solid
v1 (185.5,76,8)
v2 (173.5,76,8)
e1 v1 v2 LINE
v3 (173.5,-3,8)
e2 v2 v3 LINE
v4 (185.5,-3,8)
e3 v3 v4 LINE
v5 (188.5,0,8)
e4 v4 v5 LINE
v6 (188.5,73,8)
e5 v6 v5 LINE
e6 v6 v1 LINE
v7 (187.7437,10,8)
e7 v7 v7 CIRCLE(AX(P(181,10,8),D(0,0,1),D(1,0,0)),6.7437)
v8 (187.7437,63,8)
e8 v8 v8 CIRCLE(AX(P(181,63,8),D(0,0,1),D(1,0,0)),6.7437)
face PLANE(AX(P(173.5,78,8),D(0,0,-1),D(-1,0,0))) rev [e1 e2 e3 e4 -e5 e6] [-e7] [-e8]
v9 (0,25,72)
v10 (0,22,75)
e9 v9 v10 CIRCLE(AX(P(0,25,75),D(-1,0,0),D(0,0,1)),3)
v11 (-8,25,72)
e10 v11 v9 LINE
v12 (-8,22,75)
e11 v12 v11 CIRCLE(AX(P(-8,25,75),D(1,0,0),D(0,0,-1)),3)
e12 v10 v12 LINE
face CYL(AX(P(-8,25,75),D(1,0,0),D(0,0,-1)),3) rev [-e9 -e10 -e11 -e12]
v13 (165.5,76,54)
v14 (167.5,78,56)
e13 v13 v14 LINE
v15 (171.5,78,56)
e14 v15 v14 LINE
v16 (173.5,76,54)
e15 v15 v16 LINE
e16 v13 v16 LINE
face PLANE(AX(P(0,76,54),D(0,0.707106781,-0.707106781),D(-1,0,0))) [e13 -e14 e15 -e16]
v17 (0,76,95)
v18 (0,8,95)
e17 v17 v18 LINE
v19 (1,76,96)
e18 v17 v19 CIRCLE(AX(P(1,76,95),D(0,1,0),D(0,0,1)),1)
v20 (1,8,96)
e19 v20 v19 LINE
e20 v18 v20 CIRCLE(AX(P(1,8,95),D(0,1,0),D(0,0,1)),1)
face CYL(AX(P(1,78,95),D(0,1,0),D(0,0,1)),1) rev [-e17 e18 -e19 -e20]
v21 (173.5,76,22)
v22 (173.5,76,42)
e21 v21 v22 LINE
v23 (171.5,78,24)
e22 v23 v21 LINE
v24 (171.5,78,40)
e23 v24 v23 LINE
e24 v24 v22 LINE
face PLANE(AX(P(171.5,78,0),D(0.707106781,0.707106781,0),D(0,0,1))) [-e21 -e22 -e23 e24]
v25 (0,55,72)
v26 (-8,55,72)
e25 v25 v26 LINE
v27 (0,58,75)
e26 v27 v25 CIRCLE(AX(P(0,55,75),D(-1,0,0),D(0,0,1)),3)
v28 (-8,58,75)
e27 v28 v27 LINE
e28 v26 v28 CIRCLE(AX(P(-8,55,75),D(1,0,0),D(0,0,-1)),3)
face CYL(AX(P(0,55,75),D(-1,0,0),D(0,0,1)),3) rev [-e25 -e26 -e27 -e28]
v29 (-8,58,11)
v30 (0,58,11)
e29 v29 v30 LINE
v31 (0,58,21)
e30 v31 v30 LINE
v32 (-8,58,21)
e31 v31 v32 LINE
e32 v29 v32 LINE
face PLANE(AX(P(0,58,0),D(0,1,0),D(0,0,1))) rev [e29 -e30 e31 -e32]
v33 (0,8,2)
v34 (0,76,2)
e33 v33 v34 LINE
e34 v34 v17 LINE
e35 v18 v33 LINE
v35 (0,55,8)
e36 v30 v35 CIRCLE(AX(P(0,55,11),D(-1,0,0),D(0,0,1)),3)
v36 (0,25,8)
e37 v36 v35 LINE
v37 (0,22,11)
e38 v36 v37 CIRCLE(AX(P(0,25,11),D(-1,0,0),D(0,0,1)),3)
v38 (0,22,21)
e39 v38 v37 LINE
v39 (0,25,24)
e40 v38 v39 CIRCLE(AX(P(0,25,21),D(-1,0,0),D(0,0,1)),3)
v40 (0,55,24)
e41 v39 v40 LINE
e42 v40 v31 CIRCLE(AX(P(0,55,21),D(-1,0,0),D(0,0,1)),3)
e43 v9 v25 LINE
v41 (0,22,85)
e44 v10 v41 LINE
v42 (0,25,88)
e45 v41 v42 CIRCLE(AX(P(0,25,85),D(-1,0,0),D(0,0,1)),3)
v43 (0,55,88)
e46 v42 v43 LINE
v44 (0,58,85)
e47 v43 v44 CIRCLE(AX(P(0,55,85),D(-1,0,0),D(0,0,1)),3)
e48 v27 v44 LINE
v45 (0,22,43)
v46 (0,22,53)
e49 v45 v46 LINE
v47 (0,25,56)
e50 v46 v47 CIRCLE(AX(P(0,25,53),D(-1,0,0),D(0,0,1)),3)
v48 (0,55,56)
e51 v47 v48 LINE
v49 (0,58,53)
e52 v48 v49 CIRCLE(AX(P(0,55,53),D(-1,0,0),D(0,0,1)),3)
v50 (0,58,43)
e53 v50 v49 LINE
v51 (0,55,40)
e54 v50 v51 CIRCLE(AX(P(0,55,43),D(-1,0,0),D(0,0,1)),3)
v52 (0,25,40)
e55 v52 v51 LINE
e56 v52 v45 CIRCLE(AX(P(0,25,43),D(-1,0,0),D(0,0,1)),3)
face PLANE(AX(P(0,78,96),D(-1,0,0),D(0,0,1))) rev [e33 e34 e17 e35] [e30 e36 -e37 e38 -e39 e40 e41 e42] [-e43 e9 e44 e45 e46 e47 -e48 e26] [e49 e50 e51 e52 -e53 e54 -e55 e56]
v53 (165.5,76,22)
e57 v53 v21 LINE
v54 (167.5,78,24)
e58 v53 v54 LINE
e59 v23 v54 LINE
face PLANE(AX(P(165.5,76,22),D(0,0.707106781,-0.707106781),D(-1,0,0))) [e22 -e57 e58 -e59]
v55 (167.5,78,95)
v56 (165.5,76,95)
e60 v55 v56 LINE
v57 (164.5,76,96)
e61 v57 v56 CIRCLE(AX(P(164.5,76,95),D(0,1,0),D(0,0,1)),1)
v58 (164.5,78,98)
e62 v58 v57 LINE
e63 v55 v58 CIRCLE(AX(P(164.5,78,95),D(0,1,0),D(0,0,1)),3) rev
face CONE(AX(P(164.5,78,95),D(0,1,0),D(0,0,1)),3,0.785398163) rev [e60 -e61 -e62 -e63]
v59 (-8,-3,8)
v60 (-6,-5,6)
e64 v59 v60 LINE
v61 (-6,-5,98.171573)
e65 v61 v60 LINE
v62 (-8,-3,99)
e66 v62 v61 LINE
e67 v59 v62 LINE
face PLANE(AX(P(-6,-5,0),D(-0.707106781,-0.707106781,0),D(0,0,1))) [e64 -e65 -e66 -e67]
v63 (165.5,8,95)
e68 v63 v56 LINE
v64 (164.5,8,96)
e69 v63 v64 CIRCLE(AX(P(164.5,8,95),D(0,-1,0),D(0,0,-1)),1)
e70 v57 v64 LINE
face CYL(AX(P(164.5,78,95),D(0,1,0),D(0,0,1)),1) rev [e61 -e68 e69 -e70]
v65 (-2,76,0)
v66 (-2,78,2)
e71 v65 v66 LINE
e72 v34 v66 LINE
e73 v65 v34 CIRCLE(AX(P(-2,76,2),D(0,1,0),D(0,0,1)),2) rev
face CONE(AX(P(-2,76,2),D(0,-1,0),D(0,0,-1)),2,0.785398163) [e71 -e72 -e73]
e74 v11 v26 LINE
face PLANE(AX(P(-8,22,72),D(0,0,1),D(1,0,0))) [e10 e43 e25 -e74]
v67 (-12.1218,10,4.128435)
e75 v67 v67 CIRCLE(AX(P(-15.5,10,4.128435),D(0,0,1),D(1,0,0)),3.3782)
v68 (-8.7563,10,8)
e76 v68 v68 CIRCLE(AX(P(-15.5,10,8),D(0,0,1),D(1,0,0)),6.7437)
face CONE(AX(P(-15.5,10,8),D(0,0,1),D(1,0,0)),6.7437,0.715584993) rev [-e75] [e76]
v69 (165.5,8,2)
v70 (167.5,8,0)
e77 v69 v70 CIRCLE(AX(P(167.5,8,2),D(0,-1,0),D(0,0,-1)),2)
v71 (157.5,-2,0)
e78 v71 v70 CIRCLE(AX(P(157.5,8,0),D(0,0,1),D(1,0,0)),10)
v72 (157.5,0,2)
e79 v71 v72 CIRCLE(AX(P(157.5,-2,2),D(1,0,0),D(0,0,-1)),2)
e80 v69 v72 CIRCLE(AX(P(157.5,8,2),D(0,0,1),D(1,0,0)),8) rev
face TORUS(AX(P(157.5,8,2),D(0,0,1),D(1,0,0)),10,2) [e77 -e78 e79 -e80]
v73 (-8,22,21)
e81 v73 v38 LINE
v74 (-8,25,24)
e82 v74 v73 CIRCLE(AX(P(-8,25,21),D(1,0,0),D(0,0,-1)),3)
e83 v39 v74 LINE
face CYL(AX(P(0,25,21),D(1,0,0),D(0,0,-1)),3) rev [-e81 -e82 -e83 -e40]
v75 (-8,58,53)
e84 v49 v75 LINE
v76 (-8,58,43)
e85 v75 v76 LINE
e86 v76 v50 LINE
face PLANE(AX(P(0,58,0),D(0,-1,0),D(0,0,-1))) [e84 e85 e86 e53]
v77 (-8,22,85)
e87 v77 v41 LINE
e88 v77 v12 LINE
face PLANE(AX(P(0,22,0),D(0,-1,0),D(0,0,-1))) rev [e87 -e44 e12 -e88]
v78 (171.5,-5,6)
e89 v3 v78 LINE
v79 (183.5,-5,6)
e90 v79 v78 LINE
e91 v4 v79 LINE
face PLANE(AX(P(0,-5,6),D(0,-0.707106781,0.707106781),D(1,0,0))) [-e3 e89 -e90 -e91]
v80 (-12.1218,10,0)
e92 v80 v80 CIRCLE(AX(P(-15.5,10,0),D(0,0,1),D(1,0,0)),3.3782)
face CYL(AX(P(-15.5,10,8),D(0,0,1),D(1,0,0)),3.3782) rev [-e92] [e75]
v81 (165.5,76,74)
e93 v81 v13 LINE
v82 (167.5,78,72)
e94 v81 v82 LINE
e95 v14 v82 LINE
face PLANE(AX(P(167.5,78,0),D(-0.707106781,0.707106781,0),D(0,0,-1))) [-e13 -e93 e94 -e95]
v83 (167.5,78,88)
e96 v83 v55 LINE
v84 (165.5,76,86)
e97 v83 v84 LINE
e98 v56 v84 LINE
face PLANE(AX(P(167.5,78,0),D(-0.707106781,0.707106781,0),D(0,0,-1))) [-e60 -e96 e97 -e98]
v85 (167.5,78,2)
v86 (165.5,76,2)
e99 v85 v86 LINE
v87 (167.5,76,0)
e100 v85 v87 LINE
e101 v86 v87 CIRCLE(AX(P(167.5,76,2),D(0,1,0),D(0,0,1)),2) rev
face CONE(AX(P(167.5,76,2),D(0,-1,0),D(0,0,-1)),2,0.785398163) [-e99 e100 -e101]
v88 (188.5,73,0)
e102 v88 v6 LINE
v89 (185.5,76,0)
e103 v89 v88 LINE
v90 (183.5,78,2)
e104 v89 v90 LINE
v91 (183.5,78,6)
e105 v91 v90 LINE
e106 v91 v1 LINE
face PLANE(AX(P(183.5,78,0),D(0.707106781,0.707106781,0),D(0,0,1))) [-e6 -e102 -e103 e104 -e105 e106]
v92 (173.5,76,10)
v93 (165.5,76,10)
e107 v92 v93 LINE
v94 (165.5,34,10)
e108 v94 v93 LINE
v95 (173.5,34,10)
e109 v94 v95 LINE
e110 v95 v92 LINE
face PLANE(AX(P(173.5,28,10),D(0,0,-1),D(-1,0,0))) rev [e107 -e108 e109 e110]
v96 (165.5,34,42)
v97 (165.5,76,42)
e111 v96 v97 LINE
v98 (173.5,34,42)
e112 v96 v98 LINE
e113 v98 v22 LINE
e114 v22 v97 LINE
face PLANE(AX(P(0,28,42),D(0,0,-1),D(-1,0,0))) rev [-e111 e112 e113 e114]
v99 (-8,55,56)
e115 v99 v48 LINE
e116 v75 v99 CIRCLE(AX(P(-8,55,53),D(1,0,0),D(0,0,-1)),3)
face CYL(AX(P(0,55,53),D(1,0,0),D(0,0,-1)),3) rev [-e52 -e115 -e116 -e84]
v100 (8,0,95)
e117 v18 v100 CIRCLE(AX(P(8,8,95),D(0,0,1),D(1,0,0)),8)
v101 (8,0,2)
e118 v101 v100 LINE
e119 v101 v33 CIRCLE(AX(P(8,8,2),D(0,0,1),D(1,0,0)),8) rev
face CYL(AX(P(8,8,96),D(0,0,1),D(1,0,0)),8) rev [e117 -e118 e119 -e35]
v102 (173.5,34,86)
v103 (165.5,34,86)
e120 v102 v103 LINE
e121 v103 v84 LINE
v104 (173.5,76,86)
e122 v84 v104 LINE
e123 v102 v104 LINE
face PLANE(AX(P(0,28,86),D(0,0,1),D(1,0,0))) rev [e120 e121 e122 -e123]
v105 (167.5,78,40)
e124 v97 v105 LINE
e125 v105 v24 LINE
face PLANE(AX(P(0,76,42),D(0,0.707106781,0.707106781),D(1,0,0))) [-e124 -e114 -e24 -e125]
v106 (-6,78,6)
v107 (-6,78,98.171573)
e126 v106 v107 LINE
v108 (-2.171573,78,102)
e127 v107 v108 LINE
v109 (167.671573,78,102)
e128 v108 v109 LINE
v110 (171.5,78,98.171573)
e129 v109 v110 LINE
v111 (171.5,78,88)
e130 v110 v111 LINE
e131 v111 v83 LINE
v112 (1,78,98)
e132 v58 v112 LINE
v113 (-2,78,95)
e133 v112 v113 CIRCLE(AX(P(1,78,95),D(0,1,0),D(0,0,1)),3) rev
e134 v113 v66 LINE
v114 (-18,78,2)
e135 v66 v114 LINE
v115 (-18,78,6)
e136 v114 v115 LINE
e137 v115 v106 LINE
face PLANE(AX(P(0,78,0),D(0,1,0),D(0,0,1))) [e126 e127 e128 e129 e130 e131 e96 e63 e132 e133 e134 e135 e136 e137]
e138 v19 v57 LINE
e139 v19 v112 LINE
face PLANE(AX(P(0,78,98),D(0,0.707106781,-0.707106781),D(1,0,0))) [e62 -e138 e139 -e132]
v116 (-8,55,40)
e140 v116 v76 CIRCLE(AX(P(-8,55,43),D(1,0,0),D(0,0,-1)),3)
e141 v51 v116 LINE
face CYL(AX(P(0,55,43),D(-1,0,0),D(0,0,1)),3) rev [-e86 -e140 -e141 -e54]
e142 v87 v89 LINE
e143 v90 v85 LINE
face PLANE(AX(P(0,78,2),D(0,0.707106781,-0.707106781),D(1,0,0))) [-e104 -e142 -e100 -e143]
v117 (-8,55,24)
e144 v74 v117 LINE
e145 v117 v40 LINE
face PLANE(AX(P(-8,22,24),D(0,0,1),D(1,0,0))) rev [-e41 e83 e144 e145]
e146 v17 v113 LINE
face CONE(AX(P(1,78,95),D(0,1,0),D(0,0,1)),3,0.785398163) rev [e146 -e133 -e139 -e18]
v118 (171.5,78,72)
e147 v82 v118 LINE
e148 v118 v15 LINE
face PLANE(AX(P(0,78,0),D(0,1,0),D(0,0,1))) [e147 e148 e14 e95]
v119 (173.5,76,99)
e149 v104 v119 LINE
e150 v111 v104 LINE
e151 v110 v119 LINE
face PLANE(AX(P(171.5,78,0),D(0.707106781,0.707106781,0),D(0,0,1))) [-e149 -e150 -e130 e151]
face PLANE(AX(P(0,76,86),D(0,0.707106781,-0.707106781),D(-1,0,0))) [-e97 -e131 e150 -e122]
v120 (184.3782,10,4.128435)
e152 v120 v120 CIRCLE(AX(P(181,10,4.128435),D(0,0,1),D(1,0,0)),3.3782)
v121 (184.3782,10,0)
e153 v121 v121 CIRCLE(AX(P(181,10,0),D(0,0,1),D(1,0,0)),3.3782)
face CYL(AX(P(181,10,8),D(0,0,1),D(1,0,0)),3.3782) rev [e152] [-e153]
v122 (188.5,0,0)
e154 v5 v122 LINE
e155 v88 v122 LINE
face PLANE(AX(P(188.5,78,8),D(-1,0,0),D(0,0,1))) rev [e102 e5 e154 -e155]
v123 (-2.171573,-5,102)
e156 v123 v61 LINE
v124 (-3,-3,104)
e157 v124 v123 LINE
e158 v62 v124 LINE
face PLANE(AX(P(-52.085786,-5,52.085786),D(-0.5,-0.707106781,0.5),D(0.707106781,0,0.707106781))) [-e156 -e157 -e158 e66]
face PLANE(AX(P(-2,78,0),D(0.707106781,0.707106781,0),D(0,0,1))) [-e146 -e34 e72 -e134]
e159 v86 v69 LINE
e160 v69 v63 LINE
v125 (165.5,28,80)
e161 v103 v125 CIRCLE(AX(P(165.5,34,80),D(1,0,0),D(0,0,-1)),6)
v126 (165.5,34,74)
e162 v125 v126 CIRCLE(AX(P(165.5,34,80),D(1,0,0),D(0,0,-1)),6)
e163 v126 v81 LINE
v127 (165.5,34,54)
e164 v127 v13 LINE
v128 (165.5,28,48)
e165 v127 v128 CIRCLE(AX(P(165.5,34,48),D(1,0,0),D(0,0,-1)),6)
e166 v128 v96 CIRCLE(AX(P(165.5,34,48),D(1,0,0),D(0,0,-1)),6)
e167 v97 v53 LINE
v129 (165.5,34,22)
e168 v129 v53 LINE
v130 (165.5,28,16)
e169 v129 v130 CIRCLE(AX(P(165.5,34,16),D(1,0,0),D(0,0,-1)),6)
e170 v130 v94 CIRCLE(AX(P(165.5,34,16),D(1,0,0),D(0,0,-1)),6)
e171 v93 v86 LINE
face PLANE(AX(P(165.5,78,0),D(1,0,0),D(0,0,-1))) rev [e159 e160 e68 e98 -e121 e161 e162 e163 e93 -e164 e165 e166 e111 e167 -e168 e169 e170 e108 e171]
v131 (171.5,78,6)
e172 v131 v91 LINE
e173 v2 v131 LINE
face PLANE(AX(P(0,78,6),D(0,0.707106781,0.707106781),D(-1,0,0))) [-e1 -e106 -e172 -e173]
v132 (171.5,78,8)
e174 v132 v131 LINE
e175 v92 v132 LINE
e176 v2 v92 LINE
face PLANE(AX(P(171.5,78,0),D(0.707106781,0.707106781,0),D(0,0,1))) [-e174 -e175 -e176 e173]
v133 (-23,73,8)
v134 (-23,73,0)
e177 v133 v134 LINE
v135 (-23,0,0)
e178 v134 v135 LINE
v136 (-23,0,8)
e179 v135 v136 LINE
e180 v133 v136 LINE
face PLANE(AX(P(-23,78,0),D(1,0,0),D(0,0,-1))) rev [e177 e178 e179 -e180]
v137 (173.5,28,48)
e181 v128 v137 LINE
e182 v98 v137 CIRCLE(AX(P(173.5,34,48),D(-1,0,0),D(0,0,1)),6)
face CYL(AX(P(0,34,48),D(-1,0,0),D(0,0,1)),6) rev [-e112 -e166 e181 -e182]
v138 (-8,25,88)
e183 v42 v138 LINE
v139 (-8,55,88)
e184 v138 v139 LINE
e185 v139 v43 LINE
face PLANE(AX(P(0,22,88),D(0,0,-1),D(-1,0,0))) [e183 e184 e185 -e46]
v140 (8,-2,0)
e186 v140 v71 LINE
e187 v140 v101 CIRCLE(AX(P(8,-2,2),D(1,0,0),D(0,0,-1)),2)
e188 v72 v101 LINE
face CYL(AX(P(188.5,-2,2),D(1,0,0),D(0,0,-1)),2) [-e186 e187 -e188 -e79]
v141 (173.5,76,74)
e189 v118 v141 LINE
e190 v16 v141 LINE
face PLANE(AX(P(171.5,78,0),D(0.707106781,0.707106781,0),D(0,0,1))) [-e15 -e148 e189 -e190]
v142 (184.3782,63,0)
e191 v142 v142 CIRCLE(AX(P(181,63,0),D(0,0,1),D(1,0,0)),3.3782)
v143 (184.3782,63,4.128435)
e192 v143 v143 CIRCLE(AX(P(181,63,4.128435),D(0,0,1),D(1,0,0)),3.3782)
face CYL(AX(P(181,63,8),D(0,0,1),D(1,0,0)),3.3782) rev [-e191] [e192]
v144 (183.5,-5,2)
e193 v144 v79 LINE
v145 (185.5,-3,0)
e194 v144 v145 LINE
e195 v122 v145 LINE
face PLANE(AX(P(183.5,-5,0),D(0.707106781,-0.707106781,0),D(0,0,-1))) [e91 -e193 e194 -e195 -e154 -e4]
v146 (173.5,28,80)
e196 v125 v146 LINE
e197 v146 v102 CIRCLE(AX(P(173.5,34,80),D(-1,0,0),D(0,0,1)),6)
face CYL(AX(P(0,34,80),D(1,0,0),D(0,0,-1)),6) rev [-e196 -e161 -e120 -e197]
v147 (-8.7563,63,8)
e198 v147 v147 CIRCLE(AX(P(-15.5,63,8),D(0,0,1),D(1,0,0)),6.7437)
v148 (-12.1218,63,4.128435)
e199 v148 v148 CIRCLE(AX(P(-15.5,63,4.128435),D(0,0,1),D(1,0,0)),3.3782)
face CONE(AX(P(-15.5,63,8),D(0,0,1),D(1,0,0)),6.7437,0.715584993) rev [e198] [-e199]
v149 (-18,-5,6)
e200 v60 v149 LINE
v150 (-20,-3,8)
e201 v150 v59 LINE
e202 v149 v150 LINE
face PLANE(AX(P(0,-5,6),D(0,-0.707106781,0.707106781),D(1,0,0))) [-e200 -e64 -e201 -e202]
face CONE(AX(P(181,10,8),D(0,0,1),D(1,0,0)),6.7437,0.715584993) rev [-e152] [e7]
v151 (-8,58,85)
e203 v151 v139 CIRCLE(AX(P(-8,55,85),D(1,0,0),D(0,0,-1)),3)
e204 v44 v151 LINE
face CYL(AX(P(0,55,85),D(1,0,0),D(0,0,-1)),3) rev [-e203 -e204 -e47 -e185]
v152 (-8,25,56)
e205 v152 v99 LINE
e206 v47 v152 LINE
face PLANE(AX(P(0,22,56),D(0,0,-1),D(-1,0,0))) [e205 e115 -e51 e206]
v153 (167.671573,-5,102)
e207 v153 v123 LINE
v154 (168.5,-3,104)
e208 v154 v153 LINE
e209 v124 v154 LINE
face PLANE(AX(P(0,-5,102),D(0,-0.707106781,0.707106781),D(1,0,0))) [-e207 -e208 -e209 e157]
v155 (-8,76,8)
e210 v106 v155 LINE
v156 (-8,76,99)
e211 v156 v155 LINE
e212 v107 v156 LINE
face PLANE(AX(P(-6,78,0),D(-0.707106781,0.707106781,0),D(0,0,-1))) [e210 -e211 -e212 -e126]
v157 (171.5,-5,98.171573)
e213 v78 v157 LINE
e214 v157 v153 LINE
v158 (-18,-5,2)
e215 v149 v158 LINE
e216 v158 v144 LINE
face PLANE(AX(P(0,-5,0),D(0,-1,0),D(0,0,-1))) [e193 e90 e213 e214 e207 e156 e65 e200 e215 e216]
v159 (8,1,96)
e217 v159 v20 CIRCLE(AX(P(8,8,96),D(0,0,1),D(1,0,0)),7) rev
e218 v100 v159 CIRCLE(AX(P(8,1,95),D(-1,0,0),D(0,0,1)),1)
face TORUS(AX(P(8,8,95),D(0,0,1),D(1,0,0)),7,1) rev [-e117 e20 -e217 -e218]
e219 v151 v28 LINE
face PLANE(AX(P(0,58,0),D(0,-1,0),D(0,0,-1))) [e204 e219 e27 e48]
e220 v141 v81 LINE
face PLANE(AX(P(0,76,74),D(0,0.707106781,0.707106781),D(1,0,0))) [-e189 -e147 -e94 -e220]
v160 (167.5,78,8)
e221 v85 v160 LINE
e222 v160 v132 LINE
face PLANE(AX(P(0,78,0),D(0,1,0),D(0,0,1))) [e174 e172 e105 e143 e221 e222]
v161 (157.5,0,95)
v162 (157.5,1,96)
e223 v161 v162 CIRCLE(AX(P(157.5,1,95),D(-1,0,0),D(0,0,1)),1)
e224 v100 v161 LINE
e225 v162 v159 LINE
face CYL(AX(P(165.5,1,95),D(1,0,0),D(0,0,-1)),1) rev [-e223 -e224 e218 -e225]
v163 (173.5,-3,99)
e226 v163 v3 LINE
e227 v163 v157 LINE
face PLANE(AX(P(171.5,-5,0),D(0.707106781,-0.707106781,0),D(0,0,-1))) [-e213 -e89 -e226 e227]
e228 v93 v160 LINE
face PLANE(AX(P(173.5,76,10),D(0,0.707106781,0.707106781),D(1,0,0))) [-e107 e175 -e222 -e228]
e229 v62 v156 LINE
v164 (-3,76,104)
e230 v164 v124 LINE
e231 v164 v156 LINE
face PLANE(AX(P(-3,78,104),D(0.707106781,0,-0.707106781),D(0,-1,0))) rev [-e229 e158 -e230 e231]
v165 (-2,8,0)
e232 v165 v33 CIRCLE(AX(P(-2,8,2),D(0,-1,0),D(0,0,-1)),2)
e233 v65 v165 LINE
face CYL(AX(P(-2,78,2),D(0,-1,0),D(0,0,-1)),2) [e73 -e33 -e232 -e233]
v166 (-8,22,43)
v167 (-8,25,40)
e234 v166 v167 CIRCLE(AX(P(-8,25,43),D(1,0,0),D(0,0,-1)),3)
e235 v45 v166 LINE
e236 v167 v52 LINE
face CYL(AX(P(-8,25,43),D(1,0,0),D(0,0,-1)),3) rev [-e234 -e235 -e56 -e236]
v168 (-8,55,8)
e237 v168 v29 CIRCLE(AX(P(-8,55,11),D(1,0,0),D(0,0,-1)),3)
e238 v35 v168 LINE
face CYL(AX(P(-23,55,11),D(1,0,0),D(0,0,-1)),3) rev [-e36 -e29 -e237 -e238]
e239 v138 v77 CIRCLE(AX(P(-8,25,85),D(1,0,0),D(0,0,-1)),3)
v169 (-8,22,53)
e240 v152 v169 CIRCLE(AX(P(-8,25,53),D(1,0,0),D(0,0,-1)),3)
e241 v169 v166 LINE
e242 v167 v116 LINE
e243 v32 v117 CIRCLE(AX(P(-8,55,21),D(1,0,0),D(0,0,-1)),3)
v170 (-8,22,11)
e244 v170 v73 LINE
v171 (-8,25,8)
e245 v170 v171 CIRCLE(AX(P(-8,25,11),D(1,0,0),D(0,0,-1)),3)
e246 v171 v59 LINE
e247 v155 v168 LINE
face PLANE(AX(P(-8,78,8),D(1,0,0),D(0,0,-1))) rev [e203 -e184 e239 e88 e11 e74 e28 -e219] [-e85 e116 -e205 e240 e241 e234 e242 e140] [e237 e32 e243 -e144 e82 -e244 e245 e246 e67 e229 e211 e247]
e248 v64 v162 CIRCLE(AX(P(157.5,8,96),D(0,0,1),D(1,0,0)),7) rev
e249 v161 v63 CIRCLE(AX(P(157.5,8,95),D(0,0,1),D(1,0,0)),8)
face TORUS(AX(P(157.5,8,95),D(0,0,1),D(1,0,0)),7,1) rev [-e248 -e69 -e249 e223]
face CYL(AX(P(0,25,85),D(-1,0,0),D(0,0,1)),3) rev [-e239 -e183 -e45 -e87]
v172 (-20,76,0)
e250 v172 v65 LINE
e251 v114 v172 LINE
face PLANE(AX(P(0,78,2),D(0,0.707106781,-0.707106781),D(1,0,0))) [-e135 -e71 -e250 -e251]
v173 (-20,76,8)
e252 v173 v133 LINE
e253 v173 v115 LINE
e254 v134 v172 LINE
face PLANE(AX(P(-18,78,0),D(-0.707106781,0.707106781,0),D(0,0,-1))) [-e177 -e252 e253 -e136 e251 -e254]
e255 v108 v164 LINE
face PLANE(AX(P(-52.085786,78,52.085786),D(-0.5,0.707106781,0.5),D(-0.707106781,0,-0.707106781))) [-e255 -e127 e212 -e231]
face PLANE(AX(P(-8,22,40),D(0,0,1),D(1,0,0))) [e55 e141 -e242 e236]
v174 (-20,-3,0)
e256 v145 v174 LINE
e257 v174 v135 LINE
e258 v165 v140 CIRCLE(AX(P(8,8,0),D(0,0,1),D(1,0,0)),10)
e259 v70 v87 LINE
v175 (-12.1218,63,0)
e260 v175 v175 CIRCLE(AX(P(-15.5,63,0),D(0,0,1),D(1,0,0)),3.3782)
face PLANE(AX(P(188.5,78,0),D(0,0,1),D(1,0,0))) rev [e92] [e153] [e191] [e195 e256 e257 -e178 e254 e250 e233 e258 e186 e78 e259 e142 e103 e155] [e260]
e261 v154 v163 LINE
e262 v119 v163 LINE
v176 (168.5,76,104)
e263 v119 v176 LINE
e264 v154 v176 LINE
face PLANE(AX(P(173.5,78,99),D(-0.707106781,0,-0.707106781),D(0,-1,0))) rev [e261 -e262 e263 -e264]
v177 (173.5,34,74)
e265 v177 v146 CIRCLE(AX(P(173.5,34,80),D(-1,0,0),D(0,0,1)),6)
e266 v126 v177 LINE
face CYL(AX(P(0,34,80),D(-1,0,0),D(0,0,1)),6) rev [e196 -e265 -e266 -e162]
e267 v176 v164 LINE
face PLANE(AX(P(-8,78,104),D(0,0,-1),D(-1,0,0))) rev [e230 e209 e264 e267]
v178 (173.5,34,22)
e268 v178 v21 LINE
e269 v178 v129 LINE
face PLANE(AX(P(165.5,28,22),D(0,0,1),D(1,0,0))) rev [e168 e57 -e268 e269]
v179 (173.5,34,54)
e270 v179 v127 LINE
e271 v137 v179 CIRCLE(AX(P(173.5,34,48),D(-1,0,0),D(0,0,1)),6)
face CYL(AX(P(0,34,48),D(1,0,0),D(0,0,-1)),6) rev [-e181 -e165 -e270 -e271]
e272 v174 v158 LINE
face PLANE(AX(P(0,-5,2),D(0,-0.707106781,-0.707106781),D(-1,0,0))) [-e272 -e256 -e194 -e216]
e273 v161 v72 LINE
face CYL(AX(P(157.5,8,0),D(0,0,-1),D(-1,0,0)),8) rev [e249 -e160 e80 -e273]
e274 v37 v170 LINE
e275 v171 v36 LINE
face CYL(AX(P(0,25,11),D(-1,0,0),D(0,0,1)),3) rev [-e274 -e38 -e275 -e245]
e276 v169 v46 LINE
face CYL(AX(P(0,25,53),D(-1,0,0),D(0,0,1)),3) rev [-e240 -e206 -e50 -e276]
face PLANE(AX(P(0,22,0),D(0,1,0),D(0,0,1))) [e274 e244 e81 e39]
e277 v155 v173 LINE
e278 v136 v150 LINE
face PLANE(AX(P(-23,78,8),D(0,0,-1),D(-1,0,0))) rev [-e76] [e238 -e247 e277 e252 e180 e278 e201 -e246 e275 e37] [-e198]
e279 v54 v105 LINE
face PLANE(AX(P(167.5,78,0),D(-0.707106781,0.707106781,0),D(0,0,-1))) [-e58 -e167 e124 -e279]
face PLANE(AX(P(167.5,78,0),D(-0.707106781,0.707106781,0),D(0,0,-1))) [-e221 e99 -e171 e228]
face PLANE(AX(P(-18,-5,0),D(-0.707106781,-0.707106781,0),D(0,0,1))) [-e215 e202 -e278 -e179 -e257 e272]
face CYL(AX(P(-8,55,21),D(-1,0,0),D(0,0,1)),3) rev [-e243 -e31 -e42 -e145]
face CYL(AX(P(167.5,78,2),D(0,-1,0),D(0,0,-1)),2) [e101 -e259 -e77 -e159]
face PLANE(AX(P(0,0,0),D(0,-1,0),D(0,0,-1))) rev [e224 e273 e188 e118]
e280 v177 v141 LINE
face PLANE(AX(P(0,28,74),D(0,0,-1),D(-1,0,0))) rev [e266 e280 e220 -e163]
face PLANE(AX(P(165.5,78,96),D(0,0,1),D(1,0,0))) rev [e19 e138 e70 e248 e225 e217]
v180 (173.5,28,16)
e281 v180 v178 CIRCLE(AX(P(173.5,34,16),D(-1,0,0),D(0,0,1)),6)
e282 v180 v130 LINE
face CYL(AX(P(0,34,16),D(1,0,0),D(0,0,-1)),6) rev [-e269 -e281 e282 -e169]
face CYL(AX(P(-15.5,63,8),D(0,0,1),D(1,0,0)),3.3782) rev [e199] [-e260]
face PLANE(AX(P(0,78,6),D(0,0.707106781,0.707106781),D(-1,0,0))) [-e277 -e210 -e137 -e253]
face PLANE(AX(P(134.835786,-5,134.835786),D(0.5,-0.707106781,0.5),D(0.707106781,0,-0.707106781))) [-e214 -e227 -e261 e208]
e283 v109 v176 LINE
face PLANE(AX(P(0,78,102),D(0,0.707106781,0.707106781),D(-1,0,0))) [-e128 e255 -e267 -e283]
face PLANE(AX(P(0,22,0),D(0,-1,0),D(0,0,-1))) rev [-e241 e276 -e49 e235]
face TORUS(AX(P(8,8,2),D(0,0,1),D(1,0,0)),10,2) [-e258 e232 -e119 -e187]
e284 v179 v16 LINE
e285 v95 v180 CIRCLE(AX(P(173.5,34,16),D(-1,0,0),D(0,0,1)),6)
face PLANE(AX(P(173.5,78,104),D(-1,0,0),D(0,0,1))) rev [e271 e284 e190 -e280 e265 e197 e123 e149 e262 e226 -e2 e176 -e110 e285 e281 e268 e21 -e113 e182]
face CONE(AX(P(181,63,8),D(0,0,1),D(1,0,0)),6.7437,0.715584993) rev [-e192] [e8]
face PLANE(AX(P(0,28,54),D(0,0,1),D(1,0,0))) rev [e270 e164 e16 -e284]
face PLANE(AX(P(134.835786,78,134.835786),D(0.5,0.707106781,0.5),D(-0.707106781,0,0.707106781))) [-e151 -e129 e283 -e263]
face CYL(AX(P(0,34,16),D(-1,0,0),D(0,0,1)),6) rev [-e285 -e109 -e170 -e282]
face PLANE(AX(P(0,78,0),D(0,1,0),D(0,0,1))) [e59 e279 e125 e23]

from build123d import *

# Parameters (mm, degrees)
BOSS_EXTRUDE1_DEPTH                                 = 78
BOSS_EXTRUDE2_DEPTH                                 = 5
CUT_EXTRUDE1_START                                  = -20
SKETCH4_W                                           = 8
SKETCH4_H                                           = 16
CUT_EXTRUDE1_DEPTH                                  = 36
SKETCH4_5_W                                         = 8
SKETCH4_5_H                                         = 12
CUT_EXTRUDE2_DEPTH                                  = 50
CSK_FOR_1_4_FLAT_HEAD_SOCKET_CAP_SCREW1_D           = 6.7564
CSK_FOR_1_4_FLAT_HEAD_SOCKET_CAP_SCREW1_CSINK_D     = 13.4874
CSK_FOR_1_4_FLAT_HEAD_SOCKET_CAP_SCREW1_CSINK_ANGLE = 82
FILLET1_R                                           = 3
FILLET2_R                                           = 6
FILLET4_R                                           = 8
FILLET3_R                                           = 2
FILLET5_R                                           = 1
CHAMFER1_SIZE                                       = 5
CHAMFER2_SIZE                                       = 2


with BuildPart() as part:
    # Sketch1 → Boss-Extrude1 (new body)
    with BuildSketch(Plane(origin=(0, 0, 0), x_dir=(1, 0, 0), z_dir=(0, 1, 0))):
        Polygon((0, 0), (-23, 0), (-23, -8), (-8, -8), (-8, -104), (173.5, -104), (173.5, -8), (188.5, -8), (188.5, 0), (165.5, 0), (165.5, -96), (0, -96), align=None)
    extrude(amount=BOSS_EXTRUDE1_DEPTH)

    # Sketch2 → Boss-Extrude2 (add)
    with BuildSketch(Plane.XZ):
        Polygon((-23, 0), (188.5, 0), (188.5, 8), (173.5, 8), (173.5, 104), (-8, 104), (-8, 8), (-23, 8), align=None)
    extrude(amount=BOSS_EXTRUDE2_DEPTH)

    # Sketch4 → Cut-Extrude1 (cut)
    with BuildSketch(Plane(origin=(0, 78, 0), x_dir=(1, 0, 0), z_dir=(0, 1, 0)).offset(CUT_EXTRUDE1_START)):
        with Locations((-4, -16)):
            Rectangle(SKETCH4_W, SKETCH4_H)
        with Locations((-4, -48)):
            Rectangle(SKETCH4_W, SKETCH4_H)
        with Locations((-4, -80)):
            Rectangle(SKETCH4_W, SKETCH4_H)
    extrude(amount=-CUT_EXTRUDE1_DEPTH, mode=Mode.SUBTRACT)

    # Sketch4<5> → Cut-Extrude2 (cut)
    with BuildSketch(Plane(origin=(0, 78, 0), x_dir=(1, 0, 0), z_dir=(0, 1, 0))):
        with Locations((169.5, -48)):
            Rectangle(SKETCH4_5_W, SKETCH4_5_H)
        with Locations((169.5, -80)):
            Rectangle(SKETCH4_5_W, SKETCH4_5_H)
        with Locations((169.5, -16)):
            Rectangle(SKETCH4_5_W, SKETCH4_5_H)
    extrude(amount=-CUT_EXTRUDE2_DEPTH, mode=Mode.SUBTRACT)

    # CSK for 1/4 Flat Head Socket Cap Screw1 (through all)
    with Locations(Plane.XY.offset(8)):
        with Locations((181, 10), (181, 63)):
            csk_for_1_4_flat_head_socket_cap_screw1 = CounterSinkHole(CSK_FOR_1_4_FLAT_HEAD_SOCKET_CAP_SCREW1_D / 2, CSK_FOR_1_4_FLAT_HEAD_SOCKET_CAP_SCREW1_CSINK_D / 2, counter_sink_angle=CSK_FOR_1_4_FLAT_HEAD_SOCKET_CAP_SCREW1_CSINK_ANGLE)

    # Mirror1: CSK for 1/4 Flat Head Socket Cap Screw1 across plane
    add(csk_for_1_4_flat_head_socket_cap_screw1.mirror(Plane(origin=(82.75, 0, 0), x_dir=(0, 0, 1), z_dir=(1, 0, 0))), mode=Mode.SUBTRACT)

    # Fillet1
    fillet1_edges = [part.edges().sort_by_distance(p)[0] for p in [
        (-4, 22, 24),
        (-4, 22, 8),
        (-4, 58, 8),
        (-4, 58, 24),
        (-4, 58, 56),
        (-4, 58, 40),
        (-4, 22, 56),
        (-4, 22, 40),
        (-4, 58, 88),
        (-4, 58, 72),
        (-4, 22, 88),
        (-4, 22, 72),
    ]]
    fillet(fillet1_edges, radius=FILLET1_R)

    # Fillet2
    fillet2_edges = [part.edges().sort_by_distance(p)[0] for p in [
        (169.5, 28, 74),
        (169.5, 28, 42),
        (169.5, 28, 86),
        (169.5, 28, 54),
        (169.5, 28, 22),
        (169.5, 28, 10),
    ]]
    fillet(fillet2_edges, radius=FILLET2_R - 0.0001)  # a hair under: the kernel refuses the full size

    # Fillet4
    fillet4_edges = [part.edges().sort_by_distance(p)[0] for p in [
        (165.5, 0, 48),
        (0, 0, 48),
    ]]
    fillet(fillet4_edges, radius=FILLET4_R)

    # Fillet3
    fillet3_edges = [part.edges().sort_by_distance(p)[0] for p in [
        (165.5, 43, 0),
        (0, 43, 0),
        (82.75, 0, 0),
        (2.343145751, 2.343145751, 0),
        (163.156854249, 2.343145751, 0),
    ]]
    fillet(fillet3_edges, radius=FILLET3_R)

    # Fillet5
    fillet5_edges = [part.edges().sort_by_distance(p)[0] for p in [
        (0, 43, 96),
        (165.5, 43, 96),
        (82.75, 0, 96),
        (163.156854249, 2.343145751, 96),
        (2.343145751, 2.343145751, 96),
    ]]
    fillet(fillet5_edges, radius=FILLET5_R)

    # Chamfer1
    chamfer1_edges = [part.edges().sort_by_distance(p)[0] for p in [
        (-23, 78, 4),
        (173.5, 36.5, 104),
        (-8, 36.5, 104),
        (188.5, 78, 4),
        (-23, -5, 4),
        (188.5, -5, 4),
    ]]
    chamfer(chamfer1_edges, length=CHAMFER1_SIZE)

    # Chamfer2
    chamfer2_edges = [part.edges().sort_by_distance(p)[0] for p in [
        (82.75, -5, 0),
        (178.5, -5, 8),
        (173.5, -5, 53.5),
        (171, -5, 101.5),
        (82.75, -5, 104),
        (-5.5, -5, 101.5),
        (-13, -5, 8),
        (-8, -5, 53.5),
        (173.5, 78, 9),
        (178.5, 78, 8),
        (173.5, 78, 32),
        (165.5, 78, 32),
        (165.5, 78, 64),
        (173.5, 78, 64),
        (165.5, 78, 6),
        (175.5, 78, 0),
        (173.5, 78, 92.5),
        (171, 78, 101.5),
        (82.75, 78, 104),
        (-5.5, 78, 101.5),
        (-8, 78, 53.5),
        (-13, 78, 8),
        (165.5, 78, 90.5),
        (82.75, 78, 96),
        (-10, 78, 0),
        (0, 78, 48.5),
        (169.5, 78, 22),
        (169.5, 78, 42),
        (169.5, 78, 54),
        (169.5, 78, 74),
        (169.5, 78, 10),
        (169.5, 78, 86),
        (166.085786438, 78, 0.585786438),
        (-0.585786438, 78, 0.585786438),
        (165.207106781, 78, 95.707106781),
        (0.292893219, 78, 95.707106781),
    ]]
    chamfer(chamfer2_edges, length=CHAMFER2_SIZE - 0.0001)  # a hair under: the kernel refuses the full size


solid = part.part
